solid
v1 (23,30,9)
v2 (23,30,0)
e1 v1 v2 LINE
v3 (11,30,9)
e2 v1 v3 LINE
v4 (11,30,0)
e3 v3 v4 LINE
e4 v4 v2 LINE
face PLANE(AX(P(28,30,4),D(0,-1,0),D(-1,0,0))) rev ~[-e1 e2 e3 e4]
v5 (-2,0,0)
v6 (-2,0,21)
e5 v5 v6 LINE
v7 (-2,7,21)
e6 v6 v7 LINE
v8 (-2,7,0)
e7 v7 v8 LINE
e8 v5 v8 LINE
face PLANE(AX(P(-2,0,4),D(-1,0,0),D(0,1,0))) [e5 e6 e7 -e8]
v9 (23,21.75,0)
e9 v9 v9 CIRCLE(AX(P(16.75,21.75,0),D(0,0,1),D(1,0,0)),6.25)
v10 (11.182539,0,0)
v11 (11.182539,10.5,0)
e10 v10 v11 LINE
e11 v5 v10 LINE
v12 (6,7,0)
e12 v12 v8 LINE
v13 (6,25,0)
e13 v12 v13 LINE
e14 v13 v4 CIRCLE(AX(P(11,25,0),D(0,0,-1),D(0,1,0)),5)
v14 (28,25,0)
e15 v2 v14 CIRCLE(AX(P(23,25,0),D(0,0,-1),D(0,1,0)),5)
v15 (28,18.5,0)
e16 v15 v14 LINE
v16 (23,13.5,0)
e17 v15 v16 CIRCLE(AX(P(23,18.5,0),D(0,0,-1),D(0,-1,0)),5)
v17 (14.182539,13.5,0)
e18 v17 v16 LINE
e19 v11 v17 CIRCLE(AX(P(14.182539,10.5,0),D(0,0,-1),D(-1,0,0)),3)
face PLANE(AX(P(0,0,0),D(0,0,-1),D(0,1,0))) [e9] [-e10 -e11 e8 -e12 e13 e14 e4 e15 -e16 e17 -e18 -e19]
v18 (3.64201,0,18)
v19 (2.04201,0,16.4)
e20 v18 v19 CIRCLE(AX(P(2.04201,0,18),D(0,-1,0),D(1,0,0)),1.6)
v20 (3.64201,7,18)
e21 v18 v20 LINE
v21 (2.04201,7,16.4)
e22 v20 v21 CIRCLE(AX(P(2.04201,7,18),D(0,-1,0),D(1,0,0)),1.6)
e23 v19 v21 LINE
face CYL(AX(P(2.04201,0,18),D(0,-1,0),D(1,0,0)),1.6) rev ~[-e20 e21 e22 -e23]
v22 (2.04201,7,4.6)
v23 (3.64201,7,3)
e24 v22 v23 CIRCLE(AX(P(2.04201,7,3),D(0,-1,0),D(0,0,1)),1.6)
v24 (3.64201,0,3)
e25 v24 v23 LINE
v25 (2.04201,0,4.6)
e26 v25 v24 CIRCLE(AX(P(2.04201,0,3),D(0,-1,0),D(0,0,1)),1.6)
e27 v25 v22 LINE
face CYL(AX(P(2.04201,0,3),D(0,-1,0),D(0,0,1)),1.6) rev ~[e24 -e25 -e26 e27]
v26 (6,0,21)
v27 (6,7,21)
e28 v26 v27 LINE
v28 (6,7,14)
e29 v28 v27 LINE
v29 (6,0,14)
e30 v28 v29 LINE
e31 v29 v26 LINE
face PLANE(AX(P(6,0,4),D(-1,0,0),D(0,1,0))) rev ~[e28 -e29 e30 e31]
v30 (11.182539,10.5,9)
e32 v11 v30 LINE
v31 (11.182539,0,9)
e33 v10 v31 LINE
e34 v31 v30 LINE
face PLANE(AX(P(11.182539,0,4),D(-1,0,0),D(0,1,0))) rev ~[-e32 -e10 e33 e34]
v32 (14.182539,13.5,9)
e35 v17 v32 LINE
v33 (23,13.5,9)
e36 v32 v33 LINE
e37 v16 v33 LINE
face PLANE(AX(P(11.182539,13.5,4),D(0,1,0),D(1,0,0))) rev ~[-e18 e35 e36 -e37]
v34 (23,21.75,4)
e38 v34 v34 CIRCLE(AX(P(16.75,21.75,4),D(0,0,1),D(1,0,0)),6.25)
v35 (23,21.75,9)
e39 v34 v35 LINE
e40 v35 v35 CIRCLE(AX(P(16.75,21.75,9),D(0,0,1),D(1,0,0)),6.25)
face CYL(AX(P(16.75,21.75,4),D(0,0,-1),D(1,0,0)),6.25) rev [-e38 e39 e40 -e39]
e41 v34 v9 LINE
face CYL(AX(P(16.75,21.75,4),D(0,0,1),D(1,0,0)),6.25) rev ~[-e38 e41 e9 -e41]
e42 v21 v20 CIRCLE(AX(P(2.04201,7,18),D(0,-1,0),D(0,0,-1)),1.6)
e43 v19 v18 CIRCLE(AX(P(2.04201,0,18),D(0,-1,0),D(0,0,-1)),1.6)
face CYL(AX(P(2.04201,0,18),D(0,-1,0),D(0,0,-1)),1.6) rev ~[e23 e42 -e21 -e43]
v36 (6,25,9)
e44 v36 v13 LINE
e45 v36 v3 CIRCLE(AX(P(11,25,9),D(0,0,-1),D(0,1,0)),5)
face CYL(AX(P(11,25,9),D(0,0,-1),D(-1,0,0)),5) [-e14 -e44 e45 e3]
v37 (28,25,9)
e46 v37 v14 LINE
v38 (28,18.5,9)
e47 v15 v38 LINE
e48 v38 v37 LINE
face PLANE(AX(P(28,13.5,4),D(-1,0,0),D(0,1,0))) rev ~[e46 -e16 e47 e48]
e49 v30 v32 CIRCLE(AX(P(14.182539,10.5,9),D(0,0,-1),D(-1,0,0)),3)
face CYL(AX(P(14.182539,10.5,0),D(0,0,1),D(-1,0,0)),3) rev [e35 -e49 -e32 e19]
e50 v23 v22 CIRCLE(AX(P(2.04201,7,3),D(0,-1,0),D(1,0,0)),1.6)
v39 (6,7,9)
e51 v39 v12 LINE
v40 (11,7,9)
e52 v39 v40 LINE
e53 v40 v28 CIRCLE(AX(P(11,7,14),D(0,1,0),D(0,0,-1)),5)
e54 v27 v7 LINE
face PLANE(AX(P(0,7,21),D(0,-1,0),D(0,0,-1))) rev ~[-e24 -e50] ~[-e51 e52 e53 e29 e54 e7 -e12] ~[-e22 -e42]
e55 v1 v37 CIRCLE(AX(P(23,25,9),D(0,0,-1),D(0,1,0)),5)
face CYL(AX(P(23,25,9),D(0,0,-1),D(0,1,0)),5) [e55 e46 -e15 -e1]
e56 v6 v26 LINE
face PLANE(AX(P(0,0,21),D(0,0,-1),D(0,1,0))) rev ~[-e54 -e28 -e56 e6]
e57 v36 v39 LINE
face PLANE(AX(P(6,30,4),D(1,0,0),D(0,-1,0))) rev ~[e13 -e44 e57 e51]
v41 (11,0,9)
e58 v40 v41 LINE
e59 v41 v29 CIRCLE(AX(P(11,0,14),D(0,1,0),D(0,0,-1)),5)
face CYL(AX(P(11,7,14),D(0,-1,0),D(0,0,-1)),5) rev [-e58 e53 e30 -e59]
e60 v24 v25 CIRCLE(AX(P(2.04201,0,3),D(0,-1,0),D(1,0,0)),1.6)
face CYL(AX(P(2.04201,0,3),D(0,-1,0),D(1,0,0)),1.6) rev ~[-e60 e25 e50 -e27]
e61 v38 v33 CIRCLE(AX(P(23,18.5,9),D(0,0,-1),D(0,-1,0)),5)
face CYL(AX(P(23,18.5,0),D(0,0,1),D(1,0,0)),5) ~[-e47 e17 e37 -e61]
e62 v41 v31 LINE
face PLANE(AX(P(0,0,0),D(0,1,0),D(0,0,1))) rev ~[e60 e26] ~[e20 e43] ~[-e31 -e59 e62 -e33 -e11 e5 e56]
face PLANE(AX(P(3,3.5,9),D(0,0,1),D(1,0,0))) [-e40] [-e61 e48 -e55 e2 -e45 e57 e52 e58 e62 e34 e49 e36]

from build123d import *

# Parameters (mm, degrees)
F0_W      = 28
F0_H      = 30
F1_DEPTH  = 4
F2_R      = 6.25
F2_W      = 6
F2_H      = 23
F2_W_2    = 16.817460835
F2_H_2    = 13.5
F3_DEPTH  = 25
F4_W      = 6
F4_H      = 7
F4_R      = 6.25
F5_DEPTH  = 5
F6_DEPTH  = 17
F8_DEPTH  = 25
F9_R      = 5
F10_R     = 3
F11_R     = 5
F12_DEPTH = 2


with BuildPart() as f1:
    # F0 (on Top) → F1 (new body)
    with BuildSketch(Plane.XY):
        with Locations((14, 15)):
            Rectangle(F0_W, F0_H)
    extrude(amount=F1_DEPTH)

    # F2 (on face) → F3 (cut)
    with BuildSketch(Plane.XY.offset(4)):
        with Locations((16.75, 21.75)):
            Circle(F2_R)
        with Locations((3, 18.5)):
            Rectangle(F2_W, F2_H)
        with Locations((19.5912695825, 6.75)):
            Rectangle(F2_W_2, F2_H_2)
    extrude(amount=-F3_DEPTH, mode=Mode.SUBTRACT)

    # F4 (on face) → F5 (join)
    with BuildSketch(Plane.XY.offset(4)):
        with Locations((3, 3.5)):
            Rectangle(F4_W, F4_H)
        Polygon((6, 30), (6, 7), (6, 0), (11.182539165, 0), (11.182539165, 13.5), (28, 13.5), (28, 30), align=None)
        with Locations((16.75, 21.75)):
            Circle(F4_R, mode=Mode.SUBTRACT)
    extrude(amount=F5_DEPTH)

    # F4 (on face) → F6 (join)
    with BuildSketch(Plane.XY.offset(4)):
        with Locations((3, 3.5)):
            Rectangle(F4_W, F4_H)
    extrude(amount=F6_DEPTH)

    # F7 (on face) → F8 (cut)
    with BuildSketch(Plane.XZ):
        with BuildLine():
            ThreePointArc((3.6420098484, 3), (3.1733806983, 4.1313708499), (2.0420098484, 4.6))
            ThreePointArc((2.0420098484, 4.6), (0.9106389985, 1.8686291501), (3.6420098484, 3))
        make_face()
        with BuildLine():
            ThreePointArc((3.6420098484, 18), (0.9106389985, 19.1313708499), (2.0420098484, 16.4))
            ThreePointArc((2.0420098484, 16.4), (3.1733806983, 16.8686291501), (3.6420098484, 18))
        make_face()
    extrude(amount=-F8_DEPTH, mode=Mode.SUBTRACT)

    # F9
    f9_edges = [f1.edges().sort_by_distance(p)[0] for p in [
        (28, 13.5, 4.5),
        (28, 30, 4.5),
        (6, 30, 4.5),
    ]]
    fillet(f9_edges, radius=F9_R)

    # F10
    f10_edges = [f1.edges().sort_by_distance(p)[0] for p in [
        (11.182539, 13.5, 4.5),
    ]]
    fillet(f10_edges, radius=F10_R)

    # F11
    f11_edges = [f1.edges().sort_by_distance(p)[0] for p in [
        (6, 3.5, 9),
    ]]
    fillet(f11_edges, radius=F11_R)

    # F12 (add): a face of the model
    f12_faces = [f1.faces().sort_by_distance(p)[0] for p in [
        (0, 3.5, 10.5),
    ]]
    extrude(f12_faces, amount=F12_DEPTH)


solid = f1.part
